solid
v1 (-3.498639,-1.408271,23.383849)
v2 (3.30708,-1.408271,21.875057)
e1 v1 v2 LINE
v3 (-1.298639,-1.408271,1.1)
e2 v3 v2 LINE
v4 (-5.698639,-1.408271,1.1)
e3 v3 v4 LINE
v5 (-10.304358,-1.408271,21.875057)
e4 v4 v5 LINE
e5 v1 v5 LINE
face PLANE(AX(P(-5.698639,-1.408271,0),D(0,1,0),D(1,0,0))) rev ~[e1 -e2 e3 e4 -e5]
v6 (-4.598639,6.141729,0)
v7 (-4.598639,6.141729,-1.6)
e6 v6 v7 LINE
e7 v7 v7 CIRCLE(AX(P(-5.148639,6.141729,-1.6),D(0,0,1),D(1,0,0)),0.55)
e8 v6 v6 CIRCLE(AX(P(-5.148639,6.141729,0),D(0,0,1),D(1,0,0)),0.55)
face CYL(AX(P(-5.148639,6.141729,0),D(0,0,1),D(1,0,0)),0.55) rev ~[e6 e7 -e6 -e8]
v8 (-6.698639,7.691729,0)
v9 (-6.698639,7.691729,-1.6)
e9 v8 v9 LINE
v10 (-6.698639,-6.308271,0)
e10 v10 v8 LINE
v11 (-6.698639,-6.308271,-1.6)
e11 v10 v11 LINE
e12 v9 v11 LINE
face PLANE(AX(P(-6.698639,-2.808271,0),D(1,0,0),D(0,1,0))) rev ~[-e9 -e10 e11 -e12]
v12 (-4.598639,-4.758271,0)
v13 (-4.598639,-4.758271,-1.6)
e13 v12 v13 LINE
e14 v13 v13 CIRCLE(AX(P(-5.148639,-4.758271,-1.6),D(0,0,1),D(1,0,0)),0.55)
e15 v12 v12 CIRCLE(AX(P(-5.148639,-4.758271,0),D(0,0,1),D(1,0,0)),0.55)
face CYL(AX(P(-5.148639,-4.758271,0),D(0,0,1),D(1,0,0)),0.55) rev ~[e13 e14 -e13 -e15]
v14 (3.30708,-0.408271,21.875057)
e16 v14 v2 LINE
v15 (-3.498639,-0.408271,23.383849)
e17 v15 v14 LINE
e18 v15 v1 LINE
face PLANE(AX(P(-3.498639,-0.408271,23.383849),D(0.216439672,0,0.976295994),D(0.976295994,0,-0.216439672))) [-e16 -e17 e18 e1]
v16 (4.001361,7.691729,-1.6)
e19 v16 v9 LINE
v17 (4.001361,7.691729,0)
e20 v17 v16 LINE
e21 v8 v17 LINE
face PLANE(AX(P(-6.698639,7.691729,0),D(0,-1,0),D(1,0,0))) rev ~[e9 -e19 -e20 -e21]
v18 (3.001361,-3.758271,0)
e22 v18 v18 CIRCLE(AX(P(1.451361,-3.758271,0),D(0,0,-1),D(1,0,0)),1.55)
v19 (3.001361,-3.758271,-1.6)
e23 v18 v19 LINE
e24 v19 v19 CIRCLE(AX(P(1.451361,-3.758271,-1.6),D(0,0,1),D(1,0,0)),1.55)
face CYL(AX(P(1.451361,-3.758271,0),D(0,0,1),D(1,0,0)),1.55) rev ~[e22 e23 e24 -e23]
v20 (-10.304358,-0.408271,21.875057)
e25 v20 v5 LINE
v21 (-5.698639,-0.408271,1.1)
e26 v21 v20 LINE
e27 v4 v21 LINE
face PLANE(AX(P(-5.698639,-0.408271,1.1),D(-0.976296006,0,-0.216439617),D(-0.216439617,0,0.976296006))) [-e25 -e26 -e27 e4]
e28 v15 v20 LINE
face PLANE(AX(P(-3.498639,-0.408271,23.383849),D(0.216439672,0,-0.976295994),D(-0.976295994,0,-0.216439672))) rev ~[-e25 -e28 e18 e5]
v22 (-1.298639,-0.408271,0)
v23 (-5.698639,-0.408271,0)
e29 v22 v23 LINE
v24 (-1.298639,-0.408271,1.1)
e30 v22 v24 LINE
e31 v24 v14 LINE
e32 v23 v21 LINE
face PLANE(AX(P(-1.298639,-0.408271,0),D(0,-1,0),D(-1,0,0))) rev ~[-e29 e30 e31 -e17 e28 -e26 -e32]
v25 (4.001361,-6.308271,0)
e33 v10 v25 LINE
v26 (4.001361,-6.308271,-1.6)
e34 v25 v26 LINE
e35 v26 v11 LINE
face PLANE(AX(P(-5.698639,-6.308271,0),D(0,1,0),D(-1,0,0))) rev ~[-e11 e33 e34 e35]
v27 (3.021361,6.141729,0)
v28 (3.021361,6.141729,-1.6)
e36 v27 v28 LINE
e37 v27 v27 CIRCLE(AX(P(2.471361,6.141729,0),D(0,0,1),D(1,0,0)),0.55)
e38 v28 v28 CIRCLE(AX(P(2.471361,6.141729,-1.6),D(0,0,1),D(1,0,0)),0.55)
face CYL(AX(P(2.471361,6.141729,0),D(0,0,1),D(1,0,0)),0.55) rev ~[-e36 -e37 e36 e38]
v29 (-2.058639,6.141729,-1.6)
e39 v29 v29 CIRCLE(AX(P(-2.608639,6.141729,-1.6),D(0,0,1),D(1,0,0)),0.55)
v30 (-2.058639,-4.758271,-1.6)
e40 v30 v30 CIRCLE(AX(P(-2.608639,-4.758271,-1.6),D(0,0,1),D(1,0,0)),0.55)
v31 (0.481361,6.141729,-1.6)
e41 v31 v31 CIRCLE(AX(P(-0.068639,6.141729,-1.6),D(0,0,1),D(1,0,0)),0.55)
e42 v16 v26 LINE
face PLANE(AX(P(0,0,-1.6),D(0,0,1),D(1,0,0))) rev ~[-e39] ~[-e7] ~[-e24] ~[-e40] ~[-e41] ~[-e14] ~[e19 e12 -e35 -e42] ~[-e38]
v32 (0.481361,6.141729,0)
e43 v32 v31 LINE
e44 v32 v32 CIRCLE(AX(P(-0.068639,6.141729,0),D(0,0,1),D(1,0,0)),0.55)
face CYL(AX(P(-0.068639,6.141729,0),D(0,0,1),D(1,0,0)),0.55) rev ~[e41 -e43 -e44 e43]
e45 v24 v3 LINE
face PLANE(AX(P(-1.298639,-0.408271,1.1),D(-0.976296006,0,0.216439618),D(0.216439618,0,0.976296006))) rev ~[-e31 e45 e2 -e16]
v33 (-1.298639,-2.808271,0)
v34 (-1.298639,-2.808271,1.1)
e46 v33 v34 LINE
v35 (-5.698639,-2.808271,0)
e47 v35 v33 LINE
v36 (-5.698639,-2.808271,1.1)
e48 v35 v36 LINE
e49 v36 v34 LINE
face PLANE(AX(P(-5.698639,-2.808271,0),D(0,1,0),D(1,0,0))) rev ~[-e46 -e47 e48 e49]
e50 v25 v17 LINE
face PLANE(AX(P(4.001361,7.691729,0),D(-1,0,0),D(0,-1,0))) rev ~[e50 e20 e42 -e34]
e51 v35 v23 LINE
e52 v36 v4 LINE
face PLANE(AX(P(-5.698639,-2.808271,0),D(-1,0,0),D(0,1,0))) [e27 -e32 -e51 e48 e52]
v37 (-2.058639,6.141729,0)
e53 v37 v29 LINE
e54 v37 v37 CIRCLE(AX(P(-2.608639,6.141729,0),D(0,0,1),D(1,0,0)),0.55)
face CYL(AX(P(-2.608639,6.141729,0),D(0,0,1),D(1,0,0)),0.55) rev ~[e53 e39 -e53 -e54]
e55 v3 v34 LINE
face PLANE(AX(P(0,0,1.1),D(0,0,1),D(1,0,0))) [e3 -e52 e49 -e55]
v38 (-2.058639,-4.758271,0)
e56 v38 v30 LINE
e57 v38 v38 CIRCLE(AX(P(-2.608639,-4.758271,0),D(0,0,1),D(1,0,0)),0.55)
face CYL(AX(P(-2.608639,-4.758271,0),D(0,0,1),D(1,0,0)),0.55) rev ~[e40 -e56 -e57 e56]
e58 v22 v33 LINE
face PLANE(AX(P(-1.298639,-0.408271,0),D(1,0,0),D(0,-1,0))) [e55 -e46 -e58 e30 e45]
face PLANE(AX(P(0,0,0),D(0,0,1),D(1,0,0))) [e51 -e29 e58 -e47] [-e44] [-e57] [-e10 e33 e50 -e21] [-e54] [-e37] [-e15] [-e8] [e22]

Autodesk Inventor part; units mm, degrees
ref_plane "YZ Plane" through (0, 0, 0) normal (1, 0, 0) x (0, 1, 0)
ref_plane "XZ Plane" through (0, 0, 0) normal (0, 1, 0) x (-1, 0, 0)
ref_plane "XY Plane" through (0, 0, 0) normal (0, 0, 1) x (1, 0, 0)
sketch "Sketch1" plane through (0, 0, 0) normal (0, 0, 1) x (1, 0, 0)
  line L0 (-6.698639, 7.691729) -> (4.001361, 7.691729)
  line L1 (4.001361, 7.691729) -> (4.001361, -6.308271)
  line L2 (4.001361, -6.308271) -> (-6.698639, -6.308271)
  line L3 (-6.698639, -6.308271) -> (-6.698639, 7.691729)
  line L4 (4.001361, -6.308271) -> (-6.698639, -6.308271)
  line L5 (-6.698639, -6.308271) -> (-6.698639, -2.808271)
  line L6 (-6.698639, -2.808271) -> (4.001361, -2.808271)
  line L7 (4.001361, -2.808271) -> (4.001361, -6.308271)
  line L8 (-6.698639, -6.308271) -> (-5.698639, -6.308271)
  line L9 (-5.698639, -6.308271) -> (-5.698639, 7.691729)
  line L10 (-5.698639, 7.691729) -> (-6.698639, 7.691729)
  line L11 (-6.698639, 7.691729) -> (-6.698639, -6.308271)
  line L12 (-5.698639, -2.808271) -> (3.472299, -2.808271)
  line L13 (3.472299, -2.808271) -> (3.472299, -0.408271)
  line L14 (3.472299, -0.408271) -> (-5.698639, -0.408271)
  line L15 (-5.698639, -0.408271) -> (-5.698639, -2.808271)
  line L16 (-5.698639, -0.408271) -> (-1.298639, -0.408271)
  line L17 (-1.298639, -0.408271) -> (-1.298639, -2.808271)
  line L18 (-1.298639, -2.808271) -> (-5.698639, -2.808271)
  line L19 (-5.698639, -2.808271) -> (-5.698639, -0.408271)
  point P0 (0, 0)
  dimension "d0" = 10.7
  dimension "d1" = 14
  dimension "d2" = 3.5
  dimension "d3" = 1
  dimension "d4" = 2.4
  dimension "d5" = 4.4
extrude "Extrusion1" add sketch "Sketch1" against normal blind 1.6
extrude "Extrusion2" add sketch "Sketch1" along normal blind 1.1 contours L14 L17 L6 L9
sketch "Sketch2" plane through (0, 0, 0) normal (0, 0, 1) x (1, 0, 0)
  line L0 (-1.298639, -0.408271) -> (-1.298639, -2.808271)
  line L1 (-1.298639, -2.808271) -> (-5.698639, -2.808271)
  line L2 (-5.698639, -2.808271) -> (-5.698639, -0.408271)
  line L3 (-5.698639, -0.408271) -> (-1.298639, -0.408271)
  line L4 (4.001361, 7.691729) -> (-6.698639, 7.691729)
  line L5 (-6.698639, 7.691729) -> (-6.698639, -6.308271)
  line L6 (-6.698639, -6.308271) -> (4.001361, -6.308271)
  line L7 (4.001361, -6.308271) -> (4.001361, 7.691729)
  line L8 (4.001361, -6.308271) -> (4.001361, 7.691729)
  line L9 (-6.698639, 7.691729) -> (-6.698639, -6.308271)
  line L10 (4.001361, -6.308271) -> (-6.698639, -6.308271)
  line L11 (-6.698639, -6.308271) -> (-6.698639, -5.308271)
  line L12 (-6.698639, -5.308271) -> (4.001361, -5.308271)
  line L13 (4.001361, -5.308271) -> (4.001361, -6.308271)
  line L14 (4.001361, -6.308271) -> (3.001361, -6.308271)
  line L15 (3.001361, -6.308271) -> (3.001361, -2.808271)
  line L16 (3.001361, -2.808271) -> (4.001361, -2.808271)
  line L17 (4.001361, -2.808271) -> (4.001361, -6.308271)
  line L18 (-6.698639, -6.308271) -> (-0.098639, -6.308271)
  line L19 (-0.098639, -6.308271) -> (-0.098639, -2.808271)
  line L20 (-0.098639, -2.808271) -> (-6.698639, -2.808271)
  line L21 (-6.698639, -2.808271) -> (-6.698639, -6.308271)
  circle A0 centre (1.451361, -3.758271) radius 1.55
  point P0 (0, 0)
  dimension "d10" = 1
  dimension "d11" = 1
  dimension "d12" = 6.6
extrude "Extrusion3" cut sketch "Sketch2" against normal through all contours A0
sketch "Sketch3" plane through (0, 0, 0) normal (0, 0, 1) x (1, 0, 0)
  line L0 (4.001361, 7.691729) -> (4.001361, -6.308271)
  line L1 (-6.698639, 7.691729) -> (4.001361, 7.691729)
  line L2 (4.001361, 7.691729) -> (4.001361, 6.691729)
  line L3 (4.001361, 6.691729) -> (-6.698639, 6.691729)
  line L4 (-6.698639, 6.691729) -> (-6.698639, 7.691729)
  line L5 (-6.698639, 7.691729) -> (-5.698639, 7.691729)
  line L6 (-5.698639, 7.691729) -> (-5.698639, 5.612457)
  line L7 (-5.698639, 5.612457) -> (-6.698639, 5.612457)
  line L8 (-6.698639, 5.612457) -> (-6.698639, 7.691729)
  line L9 (-5.698639, 6.691729) -> (-4.598639, 6.691729)
  line L10 (-4.598639, 6.691729) -> (-4.598639, 6.161753)
  line L11 (-4.598639, 6.161753) -> (-5.698639, 6.161753)
  line L12 (-5.698639, 6.161753) -> (-5.698639, 6.691729)
  circle A0 centre (-5.148639, 6.141729) radius 0.55
  circle A1 centre (-2.608639, 6.141729) radius 0.55
  line L13 (-2.058639, 6.161753) -> (-3.158639, 6.161753)
  circle A2 centre (-0.068639, 6.141729) radius 0.55
  line L14 (0.481361, 6.161753) -> (-0.618639, 6.161753)
  circle A3 centre (2.471361, 6.141729) radius 0.55
  line L15 (3.021361, 6.161753) -> (1.921361, 6.161753)
  circle A4 centre (1.451361, -3.758271) radius 1.55
  line L16 (-1.298639, -0.408271) -> (-1.298639, -2.808271)
  line L17 (-1.298639, -2.808271) -> (-5.698639, -2.808271)
  line L18 (-5.698639, -2.808271) -> (-5.698639, -0.408271)
  line L19 (-5.698639, -0.408271) -> (-1.298639, -0.408271)
  line L20 (4.001361, 7.691729) -> (-6.698639, 7.691729)
  line L21 (-6.698639, 7.691729) -> (-6.698639, -6.308271)
  line L22 (-6.698639, -6.308271) -> (4.001361, -6.308271)
  line L23 (4.001361, -6.308271) -> (4.001361, 7.691729)
  line L24 (-6.698639, -6.308271) -> (-5.698639, -6.308271)
  line L25 (-5.698639, -6.308271) -> (-5.698639, -3.371834)
  line L26 (-5.698639, -3.371834) -> (-6.698639, -3.371834)
  line L27 (-6.698639, -3.371834) -> (-6.698639, -6.308271)
  line L28 (-6.698639, -6.308271) -> (4.001361, -6.308271)
  line L29 (-6.698639, -6.308271) -> (-3.498639, -6.308271)
  line L30 (-3.498639, -6.308271) -> (-3.498639, -5.308271)
  line L31 (-3.498639, -5.308271) -> (-6.698639, -5.308271)
  line L32 (-6.698639, -5.308271) -> (-6.698639, -6.308271)
  line L33 (-5.698639, -6.308271) -> (-4.598639, -6.308271)
  line L34 (-4.598639, -6.308271) -> (-4.598639, -3.371834)
  line L35 (-4.598639, -3.371834) -> (-5.698639, -3.371834)
  line L36 (-5.698639, -3.371834) -> (-5.698639, -6.308271)
  circle A5 centre (-5.148639, -4.758271) radius 0.55
  circle A6 centre (-2.608639, -4.758271) radius 0.55
  line L37 (-0.958639, -5.308271) -> (-4.158639, -5.308271)
  point P0 (0, 0)
  dimension "d15" = 1
  dimension "d16" = 1
  dimension "d17" = 1.1
  dimension "d20" = 2.54
  dimension "d25" = 1
  dimension "d26" = 1
  dimension "d27" = 1.1
  dimension "d30" = 2.54
sketch "Sketch3 outline for Extrusion4" plane through (0, 0, 0) normal (0, 0, 1) x (1, 0, 0)
  circle A0 centre (-5.148639, -4.758271) radius 0.55
  circle A1 centre (-2.608639, -4.758271) radius 0.55
  circle A2 centre (2.471361, 6.141729) radius 0.55
  circle A3 centre (-0.068639, 6.141729) radius 0.55
  circle A4 centre (-2.608639, 6.141729) radius 0.55
  circle A5 centre (-5.148639, 6.141729) radius 0.55
extrude "Extrusion4" cut sketch "Sketch3 outline for Extrusion4" against normal through all
sketch "Sketch4" plane through (-5.698639, -0.408271, 0) normal (0, 1, 0) x (1, 0, 0)
  line L0 (0, 0) -> (4.4, 0)
  line L1 (0, 0) -> (0, -1.1)
  line L2 (4.4, -1.1) -> (0, -1.1)
  line L3 (4.4, 0) -> (4.4, -1.1)
  line L4 (0, -1.1) -> (-17.024616, -77.893079)
  line L5 (4.4, -1.1) -> (11.53177, -33.269335)
  line L6 (2.2, -1.1) -> (2.2, -23.383849)
  line L7 (4.4, -1.1) -> (0, -1.1)
  line L8 (11.53177, -33.269335) -> (26.881941, -102.509481)
  circle A0 centre (2.2, -1.1) radius 22.283849
  line L9 (2.2, -23.383849) -> (9.005719, -21.875057)
  line L10 (2.2, -23.383849) -> (-4.605719, -21.875057)
  point P0 (5.698639, 0)
  dimension "d37" = 12.5
  dimension "d38" = 12.5
extrude "Wyciągnięcie proste5" add sketch "Sketch4" against normal blind 1 contours L2 L6 L10 L4 | L5 L9 L6 L2
sketch "Szkic5" plane through (-5.698639, -0.408271, 0) normal (0, 1, 0) x (1, 0, 0)
  line L0 (0, 0) -> (4.4, 0)
  line L1 (0, 0) -> (0, -1.1)
  line L2 (0, -1.1) -> (-4.605719, -21.875057)
  line L3 (-4.605719, -21.875057) -> (2.2, -23.383849)
  line L4 (2.2, -23.383849) -> (9.005719, -21.875057)
  line L5 (9.005719, -21.875057) -> (4.4, -1.1)
  line L6 (4.4, 0) -> (4.4, -1.1)
  line L7 (0, -1.1) -> (4.4, -1.1)
  line L8 (4.4, -1.1) -> (26.847507, -102.354162)
  line L9 (2.2, -1.1) -> (2.2, -251.1)
  line L10 (26.847507, -102.354162) -> (58.457755, -244.938774)
  line L11 (0, -1.1) -> (-54.057755, -244.938774)
  line L12 (2.2, -1.1) -> (2.2, 19.845326)
  line L13 (0, -1.1) -> (4.4, 18.747117)
  arc A0 (-54.057755, -244.938774) -> (58.457755, -244.938774) centre (2.2, 8.823559) ccw
  line L14 (2.2, -251.1) -> (0, -251.1)
  point P0 (5.698639, 0)
  dimension "d41" = 250
sketch "Szkic6" plane through (-5.698639, -0.408271, 0) normal (0, 1, 0) x (1, 0, 0)
  line L0 (2.2, -23.383849) -> (-4.605719, -21.875057)
  line L1 (-4.605719, -21.875057) -> (2.53543, 10.336584)
  line L2 (9.005719, -21.875057) -> (2.2, -23.383849)
  line L3 (9.005719, -21.875057) -> (2.2, 8.823559)
  line L4 (2.2, 8.823559) -> (2.2, -23.383849)
  line L5 (2.2, 8.823559) -> (-2.082149, -26.051744)
  line L6 (2.2, 8.823559) -> (6.293179, -24.512711)
  point P0 (5.698639, 0)
  dimension "d42" = 7
  dimension "d43" = 7
properties part number "TOF_VLCOS"
